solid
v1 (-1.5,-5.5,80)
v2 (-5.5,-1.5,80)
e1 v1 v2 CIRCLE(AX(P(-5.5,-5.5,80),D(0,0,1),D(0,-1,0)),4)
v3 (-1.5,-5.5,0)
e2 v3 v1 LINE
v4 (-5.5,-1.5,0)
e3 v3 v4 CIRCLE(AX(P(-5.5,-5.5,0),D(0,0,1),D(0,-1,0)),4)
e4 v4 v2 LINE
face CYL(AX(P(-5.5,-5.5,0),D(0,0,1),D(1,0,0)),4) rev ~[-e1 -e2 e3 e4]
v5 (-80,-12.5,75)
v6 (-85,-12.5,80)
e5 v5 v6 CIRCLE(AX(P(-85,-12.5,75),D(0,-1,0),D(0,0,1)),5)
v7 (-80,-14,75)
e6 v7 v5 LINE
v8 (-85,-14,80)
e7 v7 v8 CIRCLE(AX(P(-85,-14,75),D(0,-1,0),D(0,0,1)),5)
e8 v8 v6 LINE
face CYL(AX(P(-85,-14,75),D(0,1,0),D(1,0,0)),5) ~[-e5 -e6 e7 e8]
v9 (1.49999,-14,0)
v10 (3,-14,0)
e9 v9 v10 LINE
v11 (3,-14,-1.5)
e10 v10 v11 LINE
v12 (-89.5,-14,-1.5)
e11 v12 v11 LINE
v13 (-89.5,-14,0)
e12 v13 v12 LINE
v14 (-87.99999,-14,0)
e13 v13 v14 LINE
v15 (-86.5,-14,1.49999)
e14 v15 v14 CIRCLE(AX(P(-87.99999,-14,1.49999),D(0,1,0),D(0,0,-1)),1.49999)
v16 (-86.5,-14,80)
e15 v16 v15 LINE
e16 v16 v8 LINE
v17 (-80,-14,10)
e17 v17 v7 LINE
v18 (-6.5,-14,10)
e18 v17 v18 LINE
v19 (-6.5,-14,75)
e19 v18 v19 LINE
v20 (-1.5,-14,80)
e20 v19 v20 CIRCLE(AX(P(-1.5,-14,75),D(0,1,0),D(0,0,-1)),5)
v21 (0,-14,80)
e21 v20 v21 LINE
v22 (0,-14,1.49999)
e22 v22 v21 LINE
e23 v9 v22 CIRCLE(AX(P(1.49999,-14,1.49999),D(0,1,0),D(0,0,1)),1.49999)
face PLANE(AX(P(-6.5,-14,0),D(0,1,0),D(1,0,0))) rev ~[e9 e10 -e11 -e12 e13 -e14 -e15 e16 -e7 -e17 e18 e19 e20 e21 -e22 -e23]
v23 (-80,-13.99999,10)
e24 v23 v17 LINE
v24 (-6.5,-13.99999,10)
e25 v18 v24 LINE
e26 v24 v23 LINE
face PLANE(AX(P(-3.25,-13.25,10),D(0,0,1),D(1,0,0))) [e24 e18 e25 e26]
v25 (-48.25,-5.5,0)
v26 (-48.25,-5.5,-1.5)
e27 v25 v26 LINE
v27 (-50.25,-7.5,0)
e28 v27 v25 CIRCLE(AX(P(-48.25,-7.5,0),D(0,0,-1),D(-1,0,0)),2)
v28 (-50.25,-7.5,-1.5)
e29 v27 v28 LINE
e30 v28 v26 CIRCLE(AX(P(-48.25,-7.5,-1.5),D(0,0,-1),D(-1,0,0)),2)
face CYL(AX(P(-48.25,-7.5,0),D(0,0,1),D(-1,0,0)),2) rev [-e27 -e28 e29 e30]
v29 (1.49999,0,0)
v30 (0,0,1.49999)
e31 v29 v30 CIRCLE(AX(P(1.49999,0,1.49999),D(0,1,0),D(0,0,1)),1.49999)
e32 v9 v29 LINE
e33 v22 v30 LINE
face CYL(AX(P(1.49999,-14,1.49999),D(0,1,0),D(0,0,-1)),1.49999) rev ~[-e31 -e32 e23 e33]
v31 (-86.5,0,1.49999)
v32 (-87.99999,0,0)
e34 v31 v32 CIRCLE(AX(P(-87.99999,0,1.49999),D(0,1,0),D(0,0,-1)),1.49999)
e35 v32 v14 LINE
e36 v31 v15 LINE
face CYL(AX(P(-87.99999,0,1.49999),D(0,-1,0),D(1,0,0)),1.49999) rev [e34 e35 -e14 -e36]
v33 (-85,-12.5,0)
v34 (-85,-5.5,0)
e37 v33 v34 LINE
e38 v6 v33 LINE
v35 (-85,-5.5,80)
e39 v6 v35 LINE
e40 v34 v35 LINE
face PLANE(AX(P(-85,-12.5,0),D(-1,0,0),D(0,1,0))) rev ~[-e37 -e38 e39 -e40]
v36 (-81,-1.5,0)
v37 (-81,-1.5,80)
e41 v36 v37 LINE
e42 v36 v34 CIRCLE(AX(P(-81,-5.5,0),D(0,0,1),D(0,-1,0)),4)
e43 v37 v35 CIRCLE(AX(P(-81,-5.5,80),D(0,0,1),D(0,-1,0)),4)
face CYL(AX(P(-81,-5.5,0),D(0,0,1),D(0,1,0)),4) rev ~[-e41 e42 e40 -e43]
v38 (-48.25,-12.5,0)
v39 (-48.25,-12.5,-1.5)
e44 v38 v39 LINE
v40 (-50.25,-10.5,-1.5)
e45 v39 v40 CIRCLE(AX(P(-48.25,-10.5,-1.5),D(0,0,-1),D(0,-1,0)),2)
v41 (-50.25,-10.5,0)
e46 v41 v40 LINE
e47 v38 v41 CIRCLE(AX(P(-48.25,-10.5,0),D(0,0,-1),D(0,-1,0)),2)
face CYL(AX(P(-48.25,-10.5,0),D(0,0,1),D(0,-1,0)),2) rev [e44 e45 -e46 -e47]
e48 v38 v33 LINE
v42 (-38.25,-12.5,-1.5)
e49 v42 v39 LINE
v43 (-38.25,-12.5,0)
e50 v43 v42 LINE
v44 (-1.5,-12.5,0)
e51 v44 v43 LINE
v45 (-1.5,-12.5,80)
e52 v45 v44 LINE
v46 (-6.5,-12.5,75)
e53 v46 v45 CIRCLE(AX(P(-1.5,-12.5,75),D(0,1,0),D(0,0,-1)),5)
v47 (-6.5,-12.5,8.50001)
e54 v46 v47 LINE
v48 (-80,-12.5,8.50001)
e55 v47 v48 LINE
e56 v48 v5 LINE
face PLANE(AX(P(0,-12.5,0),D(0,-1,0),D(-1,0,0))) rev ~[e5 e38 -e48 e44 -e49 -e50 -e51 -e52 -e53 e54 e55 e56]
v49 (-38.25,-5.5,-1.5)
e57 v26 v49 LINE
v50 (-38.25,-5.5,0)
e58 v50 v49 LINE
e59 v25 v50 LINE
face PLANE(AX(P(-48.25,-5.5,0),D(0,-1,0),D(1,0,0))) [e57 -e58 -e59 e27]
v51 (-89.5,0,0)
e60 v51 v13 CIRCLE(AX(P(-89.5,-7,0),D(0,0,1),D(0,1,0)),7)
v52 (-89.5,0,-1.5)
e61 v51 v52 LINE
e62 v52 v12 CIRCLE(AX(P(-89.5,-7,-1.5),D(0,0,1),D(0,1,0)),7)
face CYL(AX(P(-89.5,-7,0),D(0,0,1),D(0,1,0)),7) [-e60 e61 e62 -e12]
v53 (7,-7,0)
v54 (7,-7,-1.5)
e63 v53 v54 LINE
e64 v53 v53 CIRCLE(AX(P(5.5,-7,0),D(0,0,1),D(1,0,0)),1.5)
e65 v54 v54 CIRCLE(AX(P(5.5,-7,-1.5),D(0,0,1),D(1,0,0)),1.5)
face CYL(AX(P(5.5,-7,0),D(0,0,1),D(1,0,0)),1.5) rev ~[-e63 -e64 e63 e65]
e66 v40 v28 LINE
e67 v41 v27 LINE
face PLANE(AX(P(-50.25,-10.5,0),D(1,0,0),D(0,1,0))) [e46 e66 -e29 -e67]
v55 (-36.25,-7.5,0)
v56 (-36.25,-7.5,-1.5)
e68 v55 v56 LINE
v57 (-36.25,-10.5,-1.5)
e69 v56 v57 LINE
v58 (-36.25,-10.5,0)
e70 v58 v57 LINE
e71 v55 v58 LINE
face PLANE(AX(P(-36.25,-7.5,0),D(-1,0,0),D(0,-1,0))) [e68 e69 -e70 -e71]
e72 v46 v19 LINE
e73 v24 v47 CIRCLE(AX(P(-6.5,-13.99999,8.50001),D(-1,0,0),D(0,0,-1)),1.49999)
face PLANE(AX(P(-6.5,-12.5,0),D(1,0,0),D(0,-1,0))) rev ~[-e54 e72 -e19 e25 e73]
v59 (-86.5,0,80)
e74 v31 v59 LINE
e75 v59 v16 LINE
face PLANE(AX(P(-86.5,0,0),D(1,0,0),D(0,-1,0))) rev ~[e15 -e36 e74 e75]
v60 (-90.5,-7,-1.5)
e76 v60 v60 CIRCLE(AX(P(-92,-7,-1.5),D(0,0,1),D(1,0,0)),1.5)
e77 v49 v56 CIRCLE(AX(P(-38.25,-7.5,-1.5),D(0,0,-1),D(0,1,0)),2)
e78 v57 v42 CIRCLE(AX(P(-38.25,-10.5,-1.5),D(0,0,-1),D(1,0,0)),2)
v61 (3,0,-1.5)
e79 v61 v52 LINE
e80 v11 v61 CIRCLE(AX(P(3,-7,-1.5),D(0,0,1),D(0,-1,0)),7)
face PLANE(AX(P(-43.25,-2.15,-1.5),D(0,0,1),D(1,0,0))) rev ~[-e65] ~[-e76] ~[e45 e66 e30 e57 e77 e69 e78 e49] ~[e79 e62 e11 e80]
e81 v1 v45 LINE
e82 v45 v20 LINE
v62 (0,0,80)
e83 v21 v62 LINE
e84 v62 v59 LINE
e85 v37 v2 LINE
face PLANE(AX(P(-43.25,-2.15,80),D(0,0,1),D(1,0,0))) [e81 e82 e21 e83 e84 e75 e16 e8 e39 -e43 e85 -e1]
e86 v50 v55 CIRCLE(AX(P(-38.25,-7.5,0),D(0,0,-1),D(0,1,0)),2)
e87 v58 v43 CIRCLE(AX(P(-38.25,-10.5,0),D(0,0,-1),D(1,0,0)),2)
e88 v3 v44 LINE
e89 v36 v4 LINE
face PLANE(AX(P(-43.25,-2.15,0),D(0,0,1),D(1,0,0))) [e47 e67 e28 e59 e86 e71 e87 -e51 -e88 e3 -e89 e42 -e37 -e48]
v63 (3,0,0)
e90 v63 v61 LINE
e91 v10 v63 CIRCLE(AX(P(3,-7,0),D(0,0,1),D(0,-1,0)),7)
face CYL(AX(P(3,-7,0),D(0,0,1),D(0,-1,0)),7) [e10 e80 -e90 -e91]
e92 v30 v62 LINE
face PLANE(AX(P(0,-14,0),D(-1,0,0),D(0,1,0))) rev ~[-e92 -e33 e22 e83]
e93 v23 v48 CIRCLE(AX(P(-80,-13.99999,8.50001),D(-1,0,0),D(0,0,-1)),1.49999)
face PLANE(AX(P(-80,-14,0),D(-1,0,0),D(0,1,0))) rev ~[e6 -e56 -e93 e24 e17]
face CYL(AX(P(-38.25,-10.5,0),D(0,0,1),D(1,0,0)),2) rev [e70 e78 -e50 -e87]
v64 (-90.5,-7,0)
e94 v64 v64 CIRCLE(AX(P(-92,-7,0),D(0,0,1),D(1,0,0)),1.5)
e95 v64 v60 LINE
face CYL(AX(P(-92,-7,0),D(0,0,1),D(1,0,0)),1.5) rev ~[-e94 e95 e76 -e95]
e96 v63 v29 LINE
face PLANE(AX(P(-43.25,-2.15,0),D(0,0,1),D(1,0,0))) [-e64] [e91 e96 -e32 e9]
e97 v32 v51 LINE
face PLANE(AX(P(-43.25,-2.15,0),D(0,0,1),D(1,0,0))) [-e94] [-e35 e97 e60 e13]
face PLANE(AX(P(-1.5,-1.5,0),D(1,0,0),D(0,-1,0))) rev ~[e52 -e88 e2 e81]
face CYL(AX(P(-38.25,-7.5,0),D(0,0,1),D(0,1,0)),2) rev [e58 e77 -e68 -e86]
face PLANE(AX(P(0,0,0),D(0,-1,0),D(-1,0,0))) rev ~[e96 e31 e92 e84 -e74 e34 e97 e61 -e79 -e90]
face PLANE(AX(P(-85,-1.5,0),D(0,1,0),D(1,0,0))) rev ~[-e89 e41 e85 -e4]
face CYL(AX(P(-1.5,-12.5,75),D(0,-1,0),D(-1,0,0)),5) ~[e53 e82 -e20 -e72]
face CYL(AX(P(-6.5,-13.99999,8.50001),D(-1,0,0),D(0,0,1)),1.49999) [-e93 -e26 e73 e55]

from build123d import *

# Parameters (mm, degrees)
F1_R     = 1.5
F2_DEPTH = 1.5
F3_DEPTH = 10
F4_DEPTH = 80
F5_R     = 5
F6_R     = 1.49999
F7_R     = 4


# Not quite as in the source:
# - a fillet or chamfer is up to 0.001 mm smaller than in the source, because OpenCascade refuses the exact size
# - a feature names something its author has since deleted; it is built from what else it names


with BuildPart() as f2:
    # F1 (on Top) → F2 (new body)
    with BuildSketch(Plane.XY):
        Polygon((-85, -12.5), (-85, -1.5), (-1.5, -1.5), (-1.5, -12.5), (0, -12.5), (0, 0), (-86.5, 0), (-86.5, -12.5), align=None)
        Polygon((-48.25, -12.5), (-80, -12.5), (-80, -14), (-6.5, -14), (-6.5, -12.5), (-38.25, -12.5), align=None)
        with BuildLine():
            Line((-1.5, -1.5), (-85, -1.5))
            Line((-85, -1.5), (-85, -12.5))
            Line((-85, -12.5), (-80, -12.5))
            Line((-80, -12.5), (-48.25, -12.5))
            ThreePointArc((-48.25, -12.5), (-49.6642135624, -11.9142135624), (-50.25, -10.5))
            Line((-50.25, -10.5), (-50.25, -7.5))
            ThreePointArc((-50.25, -7.5), (-49.6642135624, -6.0857864376), (-48.25, -5.5))
            Line((-48.25, -5.5), (-38.25, -5.5))
            ThreePointArc((-38.25, -5.5), (-36.8357864376, -6.0857864376), (-36.25, -7.5))
            Line((-36.25, -7.5), (-36.25, -10.5))
            ThreePointArc((-36.25, -10.5), (-36.8357864376, -11.9142135624), (-38.25, -12.5))
            Line((-38.25, -12.5), (-6.5, -12.5))
            Line((-6.5, -12.5), (-1.5, -12.5))
            Line((-1.5, -12.5), (-1.5, -1.5))
        make_face()
        with BuildLine():
            Line((-86.5, -14), (-86.5, -12.5))
            Line((-86.5, -12.5), (-86.5, 0))
            Line((-86.5, 0), (-89.5, 0))
            ThreePointArc((-89.5, 0), (-96.5, -7), (-89.5, -14))
            Line((-89.5, -14), (-86.5, -14))
        make_face()
        with Locations((-92, -7)):
            Circle(F1_R, mode=Mode.SUBTRACT)
        with BuildLine():
            Line((0, 0), (0, -12.5))
            Line((0, -12.5), (0, -14))
            Line((0, -14), (3, -14))
            ThreePointArc((3, -14), (10, -7), (3, 0))
            Line((3, 0), (0, 0))
        make_face()
        with Locations((5.5, -7)):
            Circle(F1_R, mode=Mode.SUBTRACT)
        Polygon((-80, -12.5), (-85, -12.5), (-86.5, -12.5), (-86.5, -14), (-80, -14), align=None)
        Polygon((0, -12.5), (-1.5, -12.5), (-6.5, -12.5), (-6.5, -14), (0, -14), align=None)
    extrude(amount=-F2_DEPTH)

    # F1 (on Top) → F3 (join)
    with BuildSketch(Plane.XY):
        Polygon((0, -12.5), (-1.5, -12.5), (-6.5, -12.5), (-6.5, -14), (0, -14), align=None)
        Polygon((-80, -12.5), (-85, -12.5), (-86.5, -12.5), (-86.5, -14), (-80, -14), align=None)
        Polygon((-48.25, -12.5), (-80, -12.5), (-80, -14), (-6.5, -14), (-6.5, -12.5), (-38.25, -12.5), align=None)
    extrude(amount=F3_DEPTH)

    # F1 (on Top) → F4 (join)
    with BuildSketch(Plane.XY):
        Polygon((-85, -12.5), (-85, -1.5), (-1.5, -1.5), (-1.5, -12.5), (0, -12.5), (0, 0), (-86.5, 0), (-86.5, -12.5), align=None)
        Polygon((-80, -12.5), (-85, -12.5), (-86.5, -12.5), (-86.5, -14), (-80, -14), align=None)
        Polygon((0, -12.5), (-1.5, -12.5), (-6.5, -12.5), (-6.5, -14), (0, -14), align=None)
    extrude(amount=F4_DEPTH)

    # F5
    f5_edges = [f2.edges().sort_by_distance(p)[0] for p in [
        (-80, -13.25, 80),
        (-6.5, -13.25, 80),
    ]]
    fillet(f5_edges, radius=F5_R)

    # F6 (radius 1.5 in the source; OpenCascade refuses exactly that, so slightly less here)
    f6_edges = [f2.edges().sort_by_distance(p)[0] for p in [
        (-43.25, -12.5, 10),
        (-86.5, -7, 0),
        (0, -7, 0),
    ]]
    fillet(f6_edges, radius=F6_R)

    # F7
    f7_edges = [f2.edges().sort_by_distance(p)[0] for p in [
        (-85, -1.5, 40),
        (-1.5, -1.5, 40),
    ]]
    fillet(f7_edges, radius=F7_R)


solid = f2.part
